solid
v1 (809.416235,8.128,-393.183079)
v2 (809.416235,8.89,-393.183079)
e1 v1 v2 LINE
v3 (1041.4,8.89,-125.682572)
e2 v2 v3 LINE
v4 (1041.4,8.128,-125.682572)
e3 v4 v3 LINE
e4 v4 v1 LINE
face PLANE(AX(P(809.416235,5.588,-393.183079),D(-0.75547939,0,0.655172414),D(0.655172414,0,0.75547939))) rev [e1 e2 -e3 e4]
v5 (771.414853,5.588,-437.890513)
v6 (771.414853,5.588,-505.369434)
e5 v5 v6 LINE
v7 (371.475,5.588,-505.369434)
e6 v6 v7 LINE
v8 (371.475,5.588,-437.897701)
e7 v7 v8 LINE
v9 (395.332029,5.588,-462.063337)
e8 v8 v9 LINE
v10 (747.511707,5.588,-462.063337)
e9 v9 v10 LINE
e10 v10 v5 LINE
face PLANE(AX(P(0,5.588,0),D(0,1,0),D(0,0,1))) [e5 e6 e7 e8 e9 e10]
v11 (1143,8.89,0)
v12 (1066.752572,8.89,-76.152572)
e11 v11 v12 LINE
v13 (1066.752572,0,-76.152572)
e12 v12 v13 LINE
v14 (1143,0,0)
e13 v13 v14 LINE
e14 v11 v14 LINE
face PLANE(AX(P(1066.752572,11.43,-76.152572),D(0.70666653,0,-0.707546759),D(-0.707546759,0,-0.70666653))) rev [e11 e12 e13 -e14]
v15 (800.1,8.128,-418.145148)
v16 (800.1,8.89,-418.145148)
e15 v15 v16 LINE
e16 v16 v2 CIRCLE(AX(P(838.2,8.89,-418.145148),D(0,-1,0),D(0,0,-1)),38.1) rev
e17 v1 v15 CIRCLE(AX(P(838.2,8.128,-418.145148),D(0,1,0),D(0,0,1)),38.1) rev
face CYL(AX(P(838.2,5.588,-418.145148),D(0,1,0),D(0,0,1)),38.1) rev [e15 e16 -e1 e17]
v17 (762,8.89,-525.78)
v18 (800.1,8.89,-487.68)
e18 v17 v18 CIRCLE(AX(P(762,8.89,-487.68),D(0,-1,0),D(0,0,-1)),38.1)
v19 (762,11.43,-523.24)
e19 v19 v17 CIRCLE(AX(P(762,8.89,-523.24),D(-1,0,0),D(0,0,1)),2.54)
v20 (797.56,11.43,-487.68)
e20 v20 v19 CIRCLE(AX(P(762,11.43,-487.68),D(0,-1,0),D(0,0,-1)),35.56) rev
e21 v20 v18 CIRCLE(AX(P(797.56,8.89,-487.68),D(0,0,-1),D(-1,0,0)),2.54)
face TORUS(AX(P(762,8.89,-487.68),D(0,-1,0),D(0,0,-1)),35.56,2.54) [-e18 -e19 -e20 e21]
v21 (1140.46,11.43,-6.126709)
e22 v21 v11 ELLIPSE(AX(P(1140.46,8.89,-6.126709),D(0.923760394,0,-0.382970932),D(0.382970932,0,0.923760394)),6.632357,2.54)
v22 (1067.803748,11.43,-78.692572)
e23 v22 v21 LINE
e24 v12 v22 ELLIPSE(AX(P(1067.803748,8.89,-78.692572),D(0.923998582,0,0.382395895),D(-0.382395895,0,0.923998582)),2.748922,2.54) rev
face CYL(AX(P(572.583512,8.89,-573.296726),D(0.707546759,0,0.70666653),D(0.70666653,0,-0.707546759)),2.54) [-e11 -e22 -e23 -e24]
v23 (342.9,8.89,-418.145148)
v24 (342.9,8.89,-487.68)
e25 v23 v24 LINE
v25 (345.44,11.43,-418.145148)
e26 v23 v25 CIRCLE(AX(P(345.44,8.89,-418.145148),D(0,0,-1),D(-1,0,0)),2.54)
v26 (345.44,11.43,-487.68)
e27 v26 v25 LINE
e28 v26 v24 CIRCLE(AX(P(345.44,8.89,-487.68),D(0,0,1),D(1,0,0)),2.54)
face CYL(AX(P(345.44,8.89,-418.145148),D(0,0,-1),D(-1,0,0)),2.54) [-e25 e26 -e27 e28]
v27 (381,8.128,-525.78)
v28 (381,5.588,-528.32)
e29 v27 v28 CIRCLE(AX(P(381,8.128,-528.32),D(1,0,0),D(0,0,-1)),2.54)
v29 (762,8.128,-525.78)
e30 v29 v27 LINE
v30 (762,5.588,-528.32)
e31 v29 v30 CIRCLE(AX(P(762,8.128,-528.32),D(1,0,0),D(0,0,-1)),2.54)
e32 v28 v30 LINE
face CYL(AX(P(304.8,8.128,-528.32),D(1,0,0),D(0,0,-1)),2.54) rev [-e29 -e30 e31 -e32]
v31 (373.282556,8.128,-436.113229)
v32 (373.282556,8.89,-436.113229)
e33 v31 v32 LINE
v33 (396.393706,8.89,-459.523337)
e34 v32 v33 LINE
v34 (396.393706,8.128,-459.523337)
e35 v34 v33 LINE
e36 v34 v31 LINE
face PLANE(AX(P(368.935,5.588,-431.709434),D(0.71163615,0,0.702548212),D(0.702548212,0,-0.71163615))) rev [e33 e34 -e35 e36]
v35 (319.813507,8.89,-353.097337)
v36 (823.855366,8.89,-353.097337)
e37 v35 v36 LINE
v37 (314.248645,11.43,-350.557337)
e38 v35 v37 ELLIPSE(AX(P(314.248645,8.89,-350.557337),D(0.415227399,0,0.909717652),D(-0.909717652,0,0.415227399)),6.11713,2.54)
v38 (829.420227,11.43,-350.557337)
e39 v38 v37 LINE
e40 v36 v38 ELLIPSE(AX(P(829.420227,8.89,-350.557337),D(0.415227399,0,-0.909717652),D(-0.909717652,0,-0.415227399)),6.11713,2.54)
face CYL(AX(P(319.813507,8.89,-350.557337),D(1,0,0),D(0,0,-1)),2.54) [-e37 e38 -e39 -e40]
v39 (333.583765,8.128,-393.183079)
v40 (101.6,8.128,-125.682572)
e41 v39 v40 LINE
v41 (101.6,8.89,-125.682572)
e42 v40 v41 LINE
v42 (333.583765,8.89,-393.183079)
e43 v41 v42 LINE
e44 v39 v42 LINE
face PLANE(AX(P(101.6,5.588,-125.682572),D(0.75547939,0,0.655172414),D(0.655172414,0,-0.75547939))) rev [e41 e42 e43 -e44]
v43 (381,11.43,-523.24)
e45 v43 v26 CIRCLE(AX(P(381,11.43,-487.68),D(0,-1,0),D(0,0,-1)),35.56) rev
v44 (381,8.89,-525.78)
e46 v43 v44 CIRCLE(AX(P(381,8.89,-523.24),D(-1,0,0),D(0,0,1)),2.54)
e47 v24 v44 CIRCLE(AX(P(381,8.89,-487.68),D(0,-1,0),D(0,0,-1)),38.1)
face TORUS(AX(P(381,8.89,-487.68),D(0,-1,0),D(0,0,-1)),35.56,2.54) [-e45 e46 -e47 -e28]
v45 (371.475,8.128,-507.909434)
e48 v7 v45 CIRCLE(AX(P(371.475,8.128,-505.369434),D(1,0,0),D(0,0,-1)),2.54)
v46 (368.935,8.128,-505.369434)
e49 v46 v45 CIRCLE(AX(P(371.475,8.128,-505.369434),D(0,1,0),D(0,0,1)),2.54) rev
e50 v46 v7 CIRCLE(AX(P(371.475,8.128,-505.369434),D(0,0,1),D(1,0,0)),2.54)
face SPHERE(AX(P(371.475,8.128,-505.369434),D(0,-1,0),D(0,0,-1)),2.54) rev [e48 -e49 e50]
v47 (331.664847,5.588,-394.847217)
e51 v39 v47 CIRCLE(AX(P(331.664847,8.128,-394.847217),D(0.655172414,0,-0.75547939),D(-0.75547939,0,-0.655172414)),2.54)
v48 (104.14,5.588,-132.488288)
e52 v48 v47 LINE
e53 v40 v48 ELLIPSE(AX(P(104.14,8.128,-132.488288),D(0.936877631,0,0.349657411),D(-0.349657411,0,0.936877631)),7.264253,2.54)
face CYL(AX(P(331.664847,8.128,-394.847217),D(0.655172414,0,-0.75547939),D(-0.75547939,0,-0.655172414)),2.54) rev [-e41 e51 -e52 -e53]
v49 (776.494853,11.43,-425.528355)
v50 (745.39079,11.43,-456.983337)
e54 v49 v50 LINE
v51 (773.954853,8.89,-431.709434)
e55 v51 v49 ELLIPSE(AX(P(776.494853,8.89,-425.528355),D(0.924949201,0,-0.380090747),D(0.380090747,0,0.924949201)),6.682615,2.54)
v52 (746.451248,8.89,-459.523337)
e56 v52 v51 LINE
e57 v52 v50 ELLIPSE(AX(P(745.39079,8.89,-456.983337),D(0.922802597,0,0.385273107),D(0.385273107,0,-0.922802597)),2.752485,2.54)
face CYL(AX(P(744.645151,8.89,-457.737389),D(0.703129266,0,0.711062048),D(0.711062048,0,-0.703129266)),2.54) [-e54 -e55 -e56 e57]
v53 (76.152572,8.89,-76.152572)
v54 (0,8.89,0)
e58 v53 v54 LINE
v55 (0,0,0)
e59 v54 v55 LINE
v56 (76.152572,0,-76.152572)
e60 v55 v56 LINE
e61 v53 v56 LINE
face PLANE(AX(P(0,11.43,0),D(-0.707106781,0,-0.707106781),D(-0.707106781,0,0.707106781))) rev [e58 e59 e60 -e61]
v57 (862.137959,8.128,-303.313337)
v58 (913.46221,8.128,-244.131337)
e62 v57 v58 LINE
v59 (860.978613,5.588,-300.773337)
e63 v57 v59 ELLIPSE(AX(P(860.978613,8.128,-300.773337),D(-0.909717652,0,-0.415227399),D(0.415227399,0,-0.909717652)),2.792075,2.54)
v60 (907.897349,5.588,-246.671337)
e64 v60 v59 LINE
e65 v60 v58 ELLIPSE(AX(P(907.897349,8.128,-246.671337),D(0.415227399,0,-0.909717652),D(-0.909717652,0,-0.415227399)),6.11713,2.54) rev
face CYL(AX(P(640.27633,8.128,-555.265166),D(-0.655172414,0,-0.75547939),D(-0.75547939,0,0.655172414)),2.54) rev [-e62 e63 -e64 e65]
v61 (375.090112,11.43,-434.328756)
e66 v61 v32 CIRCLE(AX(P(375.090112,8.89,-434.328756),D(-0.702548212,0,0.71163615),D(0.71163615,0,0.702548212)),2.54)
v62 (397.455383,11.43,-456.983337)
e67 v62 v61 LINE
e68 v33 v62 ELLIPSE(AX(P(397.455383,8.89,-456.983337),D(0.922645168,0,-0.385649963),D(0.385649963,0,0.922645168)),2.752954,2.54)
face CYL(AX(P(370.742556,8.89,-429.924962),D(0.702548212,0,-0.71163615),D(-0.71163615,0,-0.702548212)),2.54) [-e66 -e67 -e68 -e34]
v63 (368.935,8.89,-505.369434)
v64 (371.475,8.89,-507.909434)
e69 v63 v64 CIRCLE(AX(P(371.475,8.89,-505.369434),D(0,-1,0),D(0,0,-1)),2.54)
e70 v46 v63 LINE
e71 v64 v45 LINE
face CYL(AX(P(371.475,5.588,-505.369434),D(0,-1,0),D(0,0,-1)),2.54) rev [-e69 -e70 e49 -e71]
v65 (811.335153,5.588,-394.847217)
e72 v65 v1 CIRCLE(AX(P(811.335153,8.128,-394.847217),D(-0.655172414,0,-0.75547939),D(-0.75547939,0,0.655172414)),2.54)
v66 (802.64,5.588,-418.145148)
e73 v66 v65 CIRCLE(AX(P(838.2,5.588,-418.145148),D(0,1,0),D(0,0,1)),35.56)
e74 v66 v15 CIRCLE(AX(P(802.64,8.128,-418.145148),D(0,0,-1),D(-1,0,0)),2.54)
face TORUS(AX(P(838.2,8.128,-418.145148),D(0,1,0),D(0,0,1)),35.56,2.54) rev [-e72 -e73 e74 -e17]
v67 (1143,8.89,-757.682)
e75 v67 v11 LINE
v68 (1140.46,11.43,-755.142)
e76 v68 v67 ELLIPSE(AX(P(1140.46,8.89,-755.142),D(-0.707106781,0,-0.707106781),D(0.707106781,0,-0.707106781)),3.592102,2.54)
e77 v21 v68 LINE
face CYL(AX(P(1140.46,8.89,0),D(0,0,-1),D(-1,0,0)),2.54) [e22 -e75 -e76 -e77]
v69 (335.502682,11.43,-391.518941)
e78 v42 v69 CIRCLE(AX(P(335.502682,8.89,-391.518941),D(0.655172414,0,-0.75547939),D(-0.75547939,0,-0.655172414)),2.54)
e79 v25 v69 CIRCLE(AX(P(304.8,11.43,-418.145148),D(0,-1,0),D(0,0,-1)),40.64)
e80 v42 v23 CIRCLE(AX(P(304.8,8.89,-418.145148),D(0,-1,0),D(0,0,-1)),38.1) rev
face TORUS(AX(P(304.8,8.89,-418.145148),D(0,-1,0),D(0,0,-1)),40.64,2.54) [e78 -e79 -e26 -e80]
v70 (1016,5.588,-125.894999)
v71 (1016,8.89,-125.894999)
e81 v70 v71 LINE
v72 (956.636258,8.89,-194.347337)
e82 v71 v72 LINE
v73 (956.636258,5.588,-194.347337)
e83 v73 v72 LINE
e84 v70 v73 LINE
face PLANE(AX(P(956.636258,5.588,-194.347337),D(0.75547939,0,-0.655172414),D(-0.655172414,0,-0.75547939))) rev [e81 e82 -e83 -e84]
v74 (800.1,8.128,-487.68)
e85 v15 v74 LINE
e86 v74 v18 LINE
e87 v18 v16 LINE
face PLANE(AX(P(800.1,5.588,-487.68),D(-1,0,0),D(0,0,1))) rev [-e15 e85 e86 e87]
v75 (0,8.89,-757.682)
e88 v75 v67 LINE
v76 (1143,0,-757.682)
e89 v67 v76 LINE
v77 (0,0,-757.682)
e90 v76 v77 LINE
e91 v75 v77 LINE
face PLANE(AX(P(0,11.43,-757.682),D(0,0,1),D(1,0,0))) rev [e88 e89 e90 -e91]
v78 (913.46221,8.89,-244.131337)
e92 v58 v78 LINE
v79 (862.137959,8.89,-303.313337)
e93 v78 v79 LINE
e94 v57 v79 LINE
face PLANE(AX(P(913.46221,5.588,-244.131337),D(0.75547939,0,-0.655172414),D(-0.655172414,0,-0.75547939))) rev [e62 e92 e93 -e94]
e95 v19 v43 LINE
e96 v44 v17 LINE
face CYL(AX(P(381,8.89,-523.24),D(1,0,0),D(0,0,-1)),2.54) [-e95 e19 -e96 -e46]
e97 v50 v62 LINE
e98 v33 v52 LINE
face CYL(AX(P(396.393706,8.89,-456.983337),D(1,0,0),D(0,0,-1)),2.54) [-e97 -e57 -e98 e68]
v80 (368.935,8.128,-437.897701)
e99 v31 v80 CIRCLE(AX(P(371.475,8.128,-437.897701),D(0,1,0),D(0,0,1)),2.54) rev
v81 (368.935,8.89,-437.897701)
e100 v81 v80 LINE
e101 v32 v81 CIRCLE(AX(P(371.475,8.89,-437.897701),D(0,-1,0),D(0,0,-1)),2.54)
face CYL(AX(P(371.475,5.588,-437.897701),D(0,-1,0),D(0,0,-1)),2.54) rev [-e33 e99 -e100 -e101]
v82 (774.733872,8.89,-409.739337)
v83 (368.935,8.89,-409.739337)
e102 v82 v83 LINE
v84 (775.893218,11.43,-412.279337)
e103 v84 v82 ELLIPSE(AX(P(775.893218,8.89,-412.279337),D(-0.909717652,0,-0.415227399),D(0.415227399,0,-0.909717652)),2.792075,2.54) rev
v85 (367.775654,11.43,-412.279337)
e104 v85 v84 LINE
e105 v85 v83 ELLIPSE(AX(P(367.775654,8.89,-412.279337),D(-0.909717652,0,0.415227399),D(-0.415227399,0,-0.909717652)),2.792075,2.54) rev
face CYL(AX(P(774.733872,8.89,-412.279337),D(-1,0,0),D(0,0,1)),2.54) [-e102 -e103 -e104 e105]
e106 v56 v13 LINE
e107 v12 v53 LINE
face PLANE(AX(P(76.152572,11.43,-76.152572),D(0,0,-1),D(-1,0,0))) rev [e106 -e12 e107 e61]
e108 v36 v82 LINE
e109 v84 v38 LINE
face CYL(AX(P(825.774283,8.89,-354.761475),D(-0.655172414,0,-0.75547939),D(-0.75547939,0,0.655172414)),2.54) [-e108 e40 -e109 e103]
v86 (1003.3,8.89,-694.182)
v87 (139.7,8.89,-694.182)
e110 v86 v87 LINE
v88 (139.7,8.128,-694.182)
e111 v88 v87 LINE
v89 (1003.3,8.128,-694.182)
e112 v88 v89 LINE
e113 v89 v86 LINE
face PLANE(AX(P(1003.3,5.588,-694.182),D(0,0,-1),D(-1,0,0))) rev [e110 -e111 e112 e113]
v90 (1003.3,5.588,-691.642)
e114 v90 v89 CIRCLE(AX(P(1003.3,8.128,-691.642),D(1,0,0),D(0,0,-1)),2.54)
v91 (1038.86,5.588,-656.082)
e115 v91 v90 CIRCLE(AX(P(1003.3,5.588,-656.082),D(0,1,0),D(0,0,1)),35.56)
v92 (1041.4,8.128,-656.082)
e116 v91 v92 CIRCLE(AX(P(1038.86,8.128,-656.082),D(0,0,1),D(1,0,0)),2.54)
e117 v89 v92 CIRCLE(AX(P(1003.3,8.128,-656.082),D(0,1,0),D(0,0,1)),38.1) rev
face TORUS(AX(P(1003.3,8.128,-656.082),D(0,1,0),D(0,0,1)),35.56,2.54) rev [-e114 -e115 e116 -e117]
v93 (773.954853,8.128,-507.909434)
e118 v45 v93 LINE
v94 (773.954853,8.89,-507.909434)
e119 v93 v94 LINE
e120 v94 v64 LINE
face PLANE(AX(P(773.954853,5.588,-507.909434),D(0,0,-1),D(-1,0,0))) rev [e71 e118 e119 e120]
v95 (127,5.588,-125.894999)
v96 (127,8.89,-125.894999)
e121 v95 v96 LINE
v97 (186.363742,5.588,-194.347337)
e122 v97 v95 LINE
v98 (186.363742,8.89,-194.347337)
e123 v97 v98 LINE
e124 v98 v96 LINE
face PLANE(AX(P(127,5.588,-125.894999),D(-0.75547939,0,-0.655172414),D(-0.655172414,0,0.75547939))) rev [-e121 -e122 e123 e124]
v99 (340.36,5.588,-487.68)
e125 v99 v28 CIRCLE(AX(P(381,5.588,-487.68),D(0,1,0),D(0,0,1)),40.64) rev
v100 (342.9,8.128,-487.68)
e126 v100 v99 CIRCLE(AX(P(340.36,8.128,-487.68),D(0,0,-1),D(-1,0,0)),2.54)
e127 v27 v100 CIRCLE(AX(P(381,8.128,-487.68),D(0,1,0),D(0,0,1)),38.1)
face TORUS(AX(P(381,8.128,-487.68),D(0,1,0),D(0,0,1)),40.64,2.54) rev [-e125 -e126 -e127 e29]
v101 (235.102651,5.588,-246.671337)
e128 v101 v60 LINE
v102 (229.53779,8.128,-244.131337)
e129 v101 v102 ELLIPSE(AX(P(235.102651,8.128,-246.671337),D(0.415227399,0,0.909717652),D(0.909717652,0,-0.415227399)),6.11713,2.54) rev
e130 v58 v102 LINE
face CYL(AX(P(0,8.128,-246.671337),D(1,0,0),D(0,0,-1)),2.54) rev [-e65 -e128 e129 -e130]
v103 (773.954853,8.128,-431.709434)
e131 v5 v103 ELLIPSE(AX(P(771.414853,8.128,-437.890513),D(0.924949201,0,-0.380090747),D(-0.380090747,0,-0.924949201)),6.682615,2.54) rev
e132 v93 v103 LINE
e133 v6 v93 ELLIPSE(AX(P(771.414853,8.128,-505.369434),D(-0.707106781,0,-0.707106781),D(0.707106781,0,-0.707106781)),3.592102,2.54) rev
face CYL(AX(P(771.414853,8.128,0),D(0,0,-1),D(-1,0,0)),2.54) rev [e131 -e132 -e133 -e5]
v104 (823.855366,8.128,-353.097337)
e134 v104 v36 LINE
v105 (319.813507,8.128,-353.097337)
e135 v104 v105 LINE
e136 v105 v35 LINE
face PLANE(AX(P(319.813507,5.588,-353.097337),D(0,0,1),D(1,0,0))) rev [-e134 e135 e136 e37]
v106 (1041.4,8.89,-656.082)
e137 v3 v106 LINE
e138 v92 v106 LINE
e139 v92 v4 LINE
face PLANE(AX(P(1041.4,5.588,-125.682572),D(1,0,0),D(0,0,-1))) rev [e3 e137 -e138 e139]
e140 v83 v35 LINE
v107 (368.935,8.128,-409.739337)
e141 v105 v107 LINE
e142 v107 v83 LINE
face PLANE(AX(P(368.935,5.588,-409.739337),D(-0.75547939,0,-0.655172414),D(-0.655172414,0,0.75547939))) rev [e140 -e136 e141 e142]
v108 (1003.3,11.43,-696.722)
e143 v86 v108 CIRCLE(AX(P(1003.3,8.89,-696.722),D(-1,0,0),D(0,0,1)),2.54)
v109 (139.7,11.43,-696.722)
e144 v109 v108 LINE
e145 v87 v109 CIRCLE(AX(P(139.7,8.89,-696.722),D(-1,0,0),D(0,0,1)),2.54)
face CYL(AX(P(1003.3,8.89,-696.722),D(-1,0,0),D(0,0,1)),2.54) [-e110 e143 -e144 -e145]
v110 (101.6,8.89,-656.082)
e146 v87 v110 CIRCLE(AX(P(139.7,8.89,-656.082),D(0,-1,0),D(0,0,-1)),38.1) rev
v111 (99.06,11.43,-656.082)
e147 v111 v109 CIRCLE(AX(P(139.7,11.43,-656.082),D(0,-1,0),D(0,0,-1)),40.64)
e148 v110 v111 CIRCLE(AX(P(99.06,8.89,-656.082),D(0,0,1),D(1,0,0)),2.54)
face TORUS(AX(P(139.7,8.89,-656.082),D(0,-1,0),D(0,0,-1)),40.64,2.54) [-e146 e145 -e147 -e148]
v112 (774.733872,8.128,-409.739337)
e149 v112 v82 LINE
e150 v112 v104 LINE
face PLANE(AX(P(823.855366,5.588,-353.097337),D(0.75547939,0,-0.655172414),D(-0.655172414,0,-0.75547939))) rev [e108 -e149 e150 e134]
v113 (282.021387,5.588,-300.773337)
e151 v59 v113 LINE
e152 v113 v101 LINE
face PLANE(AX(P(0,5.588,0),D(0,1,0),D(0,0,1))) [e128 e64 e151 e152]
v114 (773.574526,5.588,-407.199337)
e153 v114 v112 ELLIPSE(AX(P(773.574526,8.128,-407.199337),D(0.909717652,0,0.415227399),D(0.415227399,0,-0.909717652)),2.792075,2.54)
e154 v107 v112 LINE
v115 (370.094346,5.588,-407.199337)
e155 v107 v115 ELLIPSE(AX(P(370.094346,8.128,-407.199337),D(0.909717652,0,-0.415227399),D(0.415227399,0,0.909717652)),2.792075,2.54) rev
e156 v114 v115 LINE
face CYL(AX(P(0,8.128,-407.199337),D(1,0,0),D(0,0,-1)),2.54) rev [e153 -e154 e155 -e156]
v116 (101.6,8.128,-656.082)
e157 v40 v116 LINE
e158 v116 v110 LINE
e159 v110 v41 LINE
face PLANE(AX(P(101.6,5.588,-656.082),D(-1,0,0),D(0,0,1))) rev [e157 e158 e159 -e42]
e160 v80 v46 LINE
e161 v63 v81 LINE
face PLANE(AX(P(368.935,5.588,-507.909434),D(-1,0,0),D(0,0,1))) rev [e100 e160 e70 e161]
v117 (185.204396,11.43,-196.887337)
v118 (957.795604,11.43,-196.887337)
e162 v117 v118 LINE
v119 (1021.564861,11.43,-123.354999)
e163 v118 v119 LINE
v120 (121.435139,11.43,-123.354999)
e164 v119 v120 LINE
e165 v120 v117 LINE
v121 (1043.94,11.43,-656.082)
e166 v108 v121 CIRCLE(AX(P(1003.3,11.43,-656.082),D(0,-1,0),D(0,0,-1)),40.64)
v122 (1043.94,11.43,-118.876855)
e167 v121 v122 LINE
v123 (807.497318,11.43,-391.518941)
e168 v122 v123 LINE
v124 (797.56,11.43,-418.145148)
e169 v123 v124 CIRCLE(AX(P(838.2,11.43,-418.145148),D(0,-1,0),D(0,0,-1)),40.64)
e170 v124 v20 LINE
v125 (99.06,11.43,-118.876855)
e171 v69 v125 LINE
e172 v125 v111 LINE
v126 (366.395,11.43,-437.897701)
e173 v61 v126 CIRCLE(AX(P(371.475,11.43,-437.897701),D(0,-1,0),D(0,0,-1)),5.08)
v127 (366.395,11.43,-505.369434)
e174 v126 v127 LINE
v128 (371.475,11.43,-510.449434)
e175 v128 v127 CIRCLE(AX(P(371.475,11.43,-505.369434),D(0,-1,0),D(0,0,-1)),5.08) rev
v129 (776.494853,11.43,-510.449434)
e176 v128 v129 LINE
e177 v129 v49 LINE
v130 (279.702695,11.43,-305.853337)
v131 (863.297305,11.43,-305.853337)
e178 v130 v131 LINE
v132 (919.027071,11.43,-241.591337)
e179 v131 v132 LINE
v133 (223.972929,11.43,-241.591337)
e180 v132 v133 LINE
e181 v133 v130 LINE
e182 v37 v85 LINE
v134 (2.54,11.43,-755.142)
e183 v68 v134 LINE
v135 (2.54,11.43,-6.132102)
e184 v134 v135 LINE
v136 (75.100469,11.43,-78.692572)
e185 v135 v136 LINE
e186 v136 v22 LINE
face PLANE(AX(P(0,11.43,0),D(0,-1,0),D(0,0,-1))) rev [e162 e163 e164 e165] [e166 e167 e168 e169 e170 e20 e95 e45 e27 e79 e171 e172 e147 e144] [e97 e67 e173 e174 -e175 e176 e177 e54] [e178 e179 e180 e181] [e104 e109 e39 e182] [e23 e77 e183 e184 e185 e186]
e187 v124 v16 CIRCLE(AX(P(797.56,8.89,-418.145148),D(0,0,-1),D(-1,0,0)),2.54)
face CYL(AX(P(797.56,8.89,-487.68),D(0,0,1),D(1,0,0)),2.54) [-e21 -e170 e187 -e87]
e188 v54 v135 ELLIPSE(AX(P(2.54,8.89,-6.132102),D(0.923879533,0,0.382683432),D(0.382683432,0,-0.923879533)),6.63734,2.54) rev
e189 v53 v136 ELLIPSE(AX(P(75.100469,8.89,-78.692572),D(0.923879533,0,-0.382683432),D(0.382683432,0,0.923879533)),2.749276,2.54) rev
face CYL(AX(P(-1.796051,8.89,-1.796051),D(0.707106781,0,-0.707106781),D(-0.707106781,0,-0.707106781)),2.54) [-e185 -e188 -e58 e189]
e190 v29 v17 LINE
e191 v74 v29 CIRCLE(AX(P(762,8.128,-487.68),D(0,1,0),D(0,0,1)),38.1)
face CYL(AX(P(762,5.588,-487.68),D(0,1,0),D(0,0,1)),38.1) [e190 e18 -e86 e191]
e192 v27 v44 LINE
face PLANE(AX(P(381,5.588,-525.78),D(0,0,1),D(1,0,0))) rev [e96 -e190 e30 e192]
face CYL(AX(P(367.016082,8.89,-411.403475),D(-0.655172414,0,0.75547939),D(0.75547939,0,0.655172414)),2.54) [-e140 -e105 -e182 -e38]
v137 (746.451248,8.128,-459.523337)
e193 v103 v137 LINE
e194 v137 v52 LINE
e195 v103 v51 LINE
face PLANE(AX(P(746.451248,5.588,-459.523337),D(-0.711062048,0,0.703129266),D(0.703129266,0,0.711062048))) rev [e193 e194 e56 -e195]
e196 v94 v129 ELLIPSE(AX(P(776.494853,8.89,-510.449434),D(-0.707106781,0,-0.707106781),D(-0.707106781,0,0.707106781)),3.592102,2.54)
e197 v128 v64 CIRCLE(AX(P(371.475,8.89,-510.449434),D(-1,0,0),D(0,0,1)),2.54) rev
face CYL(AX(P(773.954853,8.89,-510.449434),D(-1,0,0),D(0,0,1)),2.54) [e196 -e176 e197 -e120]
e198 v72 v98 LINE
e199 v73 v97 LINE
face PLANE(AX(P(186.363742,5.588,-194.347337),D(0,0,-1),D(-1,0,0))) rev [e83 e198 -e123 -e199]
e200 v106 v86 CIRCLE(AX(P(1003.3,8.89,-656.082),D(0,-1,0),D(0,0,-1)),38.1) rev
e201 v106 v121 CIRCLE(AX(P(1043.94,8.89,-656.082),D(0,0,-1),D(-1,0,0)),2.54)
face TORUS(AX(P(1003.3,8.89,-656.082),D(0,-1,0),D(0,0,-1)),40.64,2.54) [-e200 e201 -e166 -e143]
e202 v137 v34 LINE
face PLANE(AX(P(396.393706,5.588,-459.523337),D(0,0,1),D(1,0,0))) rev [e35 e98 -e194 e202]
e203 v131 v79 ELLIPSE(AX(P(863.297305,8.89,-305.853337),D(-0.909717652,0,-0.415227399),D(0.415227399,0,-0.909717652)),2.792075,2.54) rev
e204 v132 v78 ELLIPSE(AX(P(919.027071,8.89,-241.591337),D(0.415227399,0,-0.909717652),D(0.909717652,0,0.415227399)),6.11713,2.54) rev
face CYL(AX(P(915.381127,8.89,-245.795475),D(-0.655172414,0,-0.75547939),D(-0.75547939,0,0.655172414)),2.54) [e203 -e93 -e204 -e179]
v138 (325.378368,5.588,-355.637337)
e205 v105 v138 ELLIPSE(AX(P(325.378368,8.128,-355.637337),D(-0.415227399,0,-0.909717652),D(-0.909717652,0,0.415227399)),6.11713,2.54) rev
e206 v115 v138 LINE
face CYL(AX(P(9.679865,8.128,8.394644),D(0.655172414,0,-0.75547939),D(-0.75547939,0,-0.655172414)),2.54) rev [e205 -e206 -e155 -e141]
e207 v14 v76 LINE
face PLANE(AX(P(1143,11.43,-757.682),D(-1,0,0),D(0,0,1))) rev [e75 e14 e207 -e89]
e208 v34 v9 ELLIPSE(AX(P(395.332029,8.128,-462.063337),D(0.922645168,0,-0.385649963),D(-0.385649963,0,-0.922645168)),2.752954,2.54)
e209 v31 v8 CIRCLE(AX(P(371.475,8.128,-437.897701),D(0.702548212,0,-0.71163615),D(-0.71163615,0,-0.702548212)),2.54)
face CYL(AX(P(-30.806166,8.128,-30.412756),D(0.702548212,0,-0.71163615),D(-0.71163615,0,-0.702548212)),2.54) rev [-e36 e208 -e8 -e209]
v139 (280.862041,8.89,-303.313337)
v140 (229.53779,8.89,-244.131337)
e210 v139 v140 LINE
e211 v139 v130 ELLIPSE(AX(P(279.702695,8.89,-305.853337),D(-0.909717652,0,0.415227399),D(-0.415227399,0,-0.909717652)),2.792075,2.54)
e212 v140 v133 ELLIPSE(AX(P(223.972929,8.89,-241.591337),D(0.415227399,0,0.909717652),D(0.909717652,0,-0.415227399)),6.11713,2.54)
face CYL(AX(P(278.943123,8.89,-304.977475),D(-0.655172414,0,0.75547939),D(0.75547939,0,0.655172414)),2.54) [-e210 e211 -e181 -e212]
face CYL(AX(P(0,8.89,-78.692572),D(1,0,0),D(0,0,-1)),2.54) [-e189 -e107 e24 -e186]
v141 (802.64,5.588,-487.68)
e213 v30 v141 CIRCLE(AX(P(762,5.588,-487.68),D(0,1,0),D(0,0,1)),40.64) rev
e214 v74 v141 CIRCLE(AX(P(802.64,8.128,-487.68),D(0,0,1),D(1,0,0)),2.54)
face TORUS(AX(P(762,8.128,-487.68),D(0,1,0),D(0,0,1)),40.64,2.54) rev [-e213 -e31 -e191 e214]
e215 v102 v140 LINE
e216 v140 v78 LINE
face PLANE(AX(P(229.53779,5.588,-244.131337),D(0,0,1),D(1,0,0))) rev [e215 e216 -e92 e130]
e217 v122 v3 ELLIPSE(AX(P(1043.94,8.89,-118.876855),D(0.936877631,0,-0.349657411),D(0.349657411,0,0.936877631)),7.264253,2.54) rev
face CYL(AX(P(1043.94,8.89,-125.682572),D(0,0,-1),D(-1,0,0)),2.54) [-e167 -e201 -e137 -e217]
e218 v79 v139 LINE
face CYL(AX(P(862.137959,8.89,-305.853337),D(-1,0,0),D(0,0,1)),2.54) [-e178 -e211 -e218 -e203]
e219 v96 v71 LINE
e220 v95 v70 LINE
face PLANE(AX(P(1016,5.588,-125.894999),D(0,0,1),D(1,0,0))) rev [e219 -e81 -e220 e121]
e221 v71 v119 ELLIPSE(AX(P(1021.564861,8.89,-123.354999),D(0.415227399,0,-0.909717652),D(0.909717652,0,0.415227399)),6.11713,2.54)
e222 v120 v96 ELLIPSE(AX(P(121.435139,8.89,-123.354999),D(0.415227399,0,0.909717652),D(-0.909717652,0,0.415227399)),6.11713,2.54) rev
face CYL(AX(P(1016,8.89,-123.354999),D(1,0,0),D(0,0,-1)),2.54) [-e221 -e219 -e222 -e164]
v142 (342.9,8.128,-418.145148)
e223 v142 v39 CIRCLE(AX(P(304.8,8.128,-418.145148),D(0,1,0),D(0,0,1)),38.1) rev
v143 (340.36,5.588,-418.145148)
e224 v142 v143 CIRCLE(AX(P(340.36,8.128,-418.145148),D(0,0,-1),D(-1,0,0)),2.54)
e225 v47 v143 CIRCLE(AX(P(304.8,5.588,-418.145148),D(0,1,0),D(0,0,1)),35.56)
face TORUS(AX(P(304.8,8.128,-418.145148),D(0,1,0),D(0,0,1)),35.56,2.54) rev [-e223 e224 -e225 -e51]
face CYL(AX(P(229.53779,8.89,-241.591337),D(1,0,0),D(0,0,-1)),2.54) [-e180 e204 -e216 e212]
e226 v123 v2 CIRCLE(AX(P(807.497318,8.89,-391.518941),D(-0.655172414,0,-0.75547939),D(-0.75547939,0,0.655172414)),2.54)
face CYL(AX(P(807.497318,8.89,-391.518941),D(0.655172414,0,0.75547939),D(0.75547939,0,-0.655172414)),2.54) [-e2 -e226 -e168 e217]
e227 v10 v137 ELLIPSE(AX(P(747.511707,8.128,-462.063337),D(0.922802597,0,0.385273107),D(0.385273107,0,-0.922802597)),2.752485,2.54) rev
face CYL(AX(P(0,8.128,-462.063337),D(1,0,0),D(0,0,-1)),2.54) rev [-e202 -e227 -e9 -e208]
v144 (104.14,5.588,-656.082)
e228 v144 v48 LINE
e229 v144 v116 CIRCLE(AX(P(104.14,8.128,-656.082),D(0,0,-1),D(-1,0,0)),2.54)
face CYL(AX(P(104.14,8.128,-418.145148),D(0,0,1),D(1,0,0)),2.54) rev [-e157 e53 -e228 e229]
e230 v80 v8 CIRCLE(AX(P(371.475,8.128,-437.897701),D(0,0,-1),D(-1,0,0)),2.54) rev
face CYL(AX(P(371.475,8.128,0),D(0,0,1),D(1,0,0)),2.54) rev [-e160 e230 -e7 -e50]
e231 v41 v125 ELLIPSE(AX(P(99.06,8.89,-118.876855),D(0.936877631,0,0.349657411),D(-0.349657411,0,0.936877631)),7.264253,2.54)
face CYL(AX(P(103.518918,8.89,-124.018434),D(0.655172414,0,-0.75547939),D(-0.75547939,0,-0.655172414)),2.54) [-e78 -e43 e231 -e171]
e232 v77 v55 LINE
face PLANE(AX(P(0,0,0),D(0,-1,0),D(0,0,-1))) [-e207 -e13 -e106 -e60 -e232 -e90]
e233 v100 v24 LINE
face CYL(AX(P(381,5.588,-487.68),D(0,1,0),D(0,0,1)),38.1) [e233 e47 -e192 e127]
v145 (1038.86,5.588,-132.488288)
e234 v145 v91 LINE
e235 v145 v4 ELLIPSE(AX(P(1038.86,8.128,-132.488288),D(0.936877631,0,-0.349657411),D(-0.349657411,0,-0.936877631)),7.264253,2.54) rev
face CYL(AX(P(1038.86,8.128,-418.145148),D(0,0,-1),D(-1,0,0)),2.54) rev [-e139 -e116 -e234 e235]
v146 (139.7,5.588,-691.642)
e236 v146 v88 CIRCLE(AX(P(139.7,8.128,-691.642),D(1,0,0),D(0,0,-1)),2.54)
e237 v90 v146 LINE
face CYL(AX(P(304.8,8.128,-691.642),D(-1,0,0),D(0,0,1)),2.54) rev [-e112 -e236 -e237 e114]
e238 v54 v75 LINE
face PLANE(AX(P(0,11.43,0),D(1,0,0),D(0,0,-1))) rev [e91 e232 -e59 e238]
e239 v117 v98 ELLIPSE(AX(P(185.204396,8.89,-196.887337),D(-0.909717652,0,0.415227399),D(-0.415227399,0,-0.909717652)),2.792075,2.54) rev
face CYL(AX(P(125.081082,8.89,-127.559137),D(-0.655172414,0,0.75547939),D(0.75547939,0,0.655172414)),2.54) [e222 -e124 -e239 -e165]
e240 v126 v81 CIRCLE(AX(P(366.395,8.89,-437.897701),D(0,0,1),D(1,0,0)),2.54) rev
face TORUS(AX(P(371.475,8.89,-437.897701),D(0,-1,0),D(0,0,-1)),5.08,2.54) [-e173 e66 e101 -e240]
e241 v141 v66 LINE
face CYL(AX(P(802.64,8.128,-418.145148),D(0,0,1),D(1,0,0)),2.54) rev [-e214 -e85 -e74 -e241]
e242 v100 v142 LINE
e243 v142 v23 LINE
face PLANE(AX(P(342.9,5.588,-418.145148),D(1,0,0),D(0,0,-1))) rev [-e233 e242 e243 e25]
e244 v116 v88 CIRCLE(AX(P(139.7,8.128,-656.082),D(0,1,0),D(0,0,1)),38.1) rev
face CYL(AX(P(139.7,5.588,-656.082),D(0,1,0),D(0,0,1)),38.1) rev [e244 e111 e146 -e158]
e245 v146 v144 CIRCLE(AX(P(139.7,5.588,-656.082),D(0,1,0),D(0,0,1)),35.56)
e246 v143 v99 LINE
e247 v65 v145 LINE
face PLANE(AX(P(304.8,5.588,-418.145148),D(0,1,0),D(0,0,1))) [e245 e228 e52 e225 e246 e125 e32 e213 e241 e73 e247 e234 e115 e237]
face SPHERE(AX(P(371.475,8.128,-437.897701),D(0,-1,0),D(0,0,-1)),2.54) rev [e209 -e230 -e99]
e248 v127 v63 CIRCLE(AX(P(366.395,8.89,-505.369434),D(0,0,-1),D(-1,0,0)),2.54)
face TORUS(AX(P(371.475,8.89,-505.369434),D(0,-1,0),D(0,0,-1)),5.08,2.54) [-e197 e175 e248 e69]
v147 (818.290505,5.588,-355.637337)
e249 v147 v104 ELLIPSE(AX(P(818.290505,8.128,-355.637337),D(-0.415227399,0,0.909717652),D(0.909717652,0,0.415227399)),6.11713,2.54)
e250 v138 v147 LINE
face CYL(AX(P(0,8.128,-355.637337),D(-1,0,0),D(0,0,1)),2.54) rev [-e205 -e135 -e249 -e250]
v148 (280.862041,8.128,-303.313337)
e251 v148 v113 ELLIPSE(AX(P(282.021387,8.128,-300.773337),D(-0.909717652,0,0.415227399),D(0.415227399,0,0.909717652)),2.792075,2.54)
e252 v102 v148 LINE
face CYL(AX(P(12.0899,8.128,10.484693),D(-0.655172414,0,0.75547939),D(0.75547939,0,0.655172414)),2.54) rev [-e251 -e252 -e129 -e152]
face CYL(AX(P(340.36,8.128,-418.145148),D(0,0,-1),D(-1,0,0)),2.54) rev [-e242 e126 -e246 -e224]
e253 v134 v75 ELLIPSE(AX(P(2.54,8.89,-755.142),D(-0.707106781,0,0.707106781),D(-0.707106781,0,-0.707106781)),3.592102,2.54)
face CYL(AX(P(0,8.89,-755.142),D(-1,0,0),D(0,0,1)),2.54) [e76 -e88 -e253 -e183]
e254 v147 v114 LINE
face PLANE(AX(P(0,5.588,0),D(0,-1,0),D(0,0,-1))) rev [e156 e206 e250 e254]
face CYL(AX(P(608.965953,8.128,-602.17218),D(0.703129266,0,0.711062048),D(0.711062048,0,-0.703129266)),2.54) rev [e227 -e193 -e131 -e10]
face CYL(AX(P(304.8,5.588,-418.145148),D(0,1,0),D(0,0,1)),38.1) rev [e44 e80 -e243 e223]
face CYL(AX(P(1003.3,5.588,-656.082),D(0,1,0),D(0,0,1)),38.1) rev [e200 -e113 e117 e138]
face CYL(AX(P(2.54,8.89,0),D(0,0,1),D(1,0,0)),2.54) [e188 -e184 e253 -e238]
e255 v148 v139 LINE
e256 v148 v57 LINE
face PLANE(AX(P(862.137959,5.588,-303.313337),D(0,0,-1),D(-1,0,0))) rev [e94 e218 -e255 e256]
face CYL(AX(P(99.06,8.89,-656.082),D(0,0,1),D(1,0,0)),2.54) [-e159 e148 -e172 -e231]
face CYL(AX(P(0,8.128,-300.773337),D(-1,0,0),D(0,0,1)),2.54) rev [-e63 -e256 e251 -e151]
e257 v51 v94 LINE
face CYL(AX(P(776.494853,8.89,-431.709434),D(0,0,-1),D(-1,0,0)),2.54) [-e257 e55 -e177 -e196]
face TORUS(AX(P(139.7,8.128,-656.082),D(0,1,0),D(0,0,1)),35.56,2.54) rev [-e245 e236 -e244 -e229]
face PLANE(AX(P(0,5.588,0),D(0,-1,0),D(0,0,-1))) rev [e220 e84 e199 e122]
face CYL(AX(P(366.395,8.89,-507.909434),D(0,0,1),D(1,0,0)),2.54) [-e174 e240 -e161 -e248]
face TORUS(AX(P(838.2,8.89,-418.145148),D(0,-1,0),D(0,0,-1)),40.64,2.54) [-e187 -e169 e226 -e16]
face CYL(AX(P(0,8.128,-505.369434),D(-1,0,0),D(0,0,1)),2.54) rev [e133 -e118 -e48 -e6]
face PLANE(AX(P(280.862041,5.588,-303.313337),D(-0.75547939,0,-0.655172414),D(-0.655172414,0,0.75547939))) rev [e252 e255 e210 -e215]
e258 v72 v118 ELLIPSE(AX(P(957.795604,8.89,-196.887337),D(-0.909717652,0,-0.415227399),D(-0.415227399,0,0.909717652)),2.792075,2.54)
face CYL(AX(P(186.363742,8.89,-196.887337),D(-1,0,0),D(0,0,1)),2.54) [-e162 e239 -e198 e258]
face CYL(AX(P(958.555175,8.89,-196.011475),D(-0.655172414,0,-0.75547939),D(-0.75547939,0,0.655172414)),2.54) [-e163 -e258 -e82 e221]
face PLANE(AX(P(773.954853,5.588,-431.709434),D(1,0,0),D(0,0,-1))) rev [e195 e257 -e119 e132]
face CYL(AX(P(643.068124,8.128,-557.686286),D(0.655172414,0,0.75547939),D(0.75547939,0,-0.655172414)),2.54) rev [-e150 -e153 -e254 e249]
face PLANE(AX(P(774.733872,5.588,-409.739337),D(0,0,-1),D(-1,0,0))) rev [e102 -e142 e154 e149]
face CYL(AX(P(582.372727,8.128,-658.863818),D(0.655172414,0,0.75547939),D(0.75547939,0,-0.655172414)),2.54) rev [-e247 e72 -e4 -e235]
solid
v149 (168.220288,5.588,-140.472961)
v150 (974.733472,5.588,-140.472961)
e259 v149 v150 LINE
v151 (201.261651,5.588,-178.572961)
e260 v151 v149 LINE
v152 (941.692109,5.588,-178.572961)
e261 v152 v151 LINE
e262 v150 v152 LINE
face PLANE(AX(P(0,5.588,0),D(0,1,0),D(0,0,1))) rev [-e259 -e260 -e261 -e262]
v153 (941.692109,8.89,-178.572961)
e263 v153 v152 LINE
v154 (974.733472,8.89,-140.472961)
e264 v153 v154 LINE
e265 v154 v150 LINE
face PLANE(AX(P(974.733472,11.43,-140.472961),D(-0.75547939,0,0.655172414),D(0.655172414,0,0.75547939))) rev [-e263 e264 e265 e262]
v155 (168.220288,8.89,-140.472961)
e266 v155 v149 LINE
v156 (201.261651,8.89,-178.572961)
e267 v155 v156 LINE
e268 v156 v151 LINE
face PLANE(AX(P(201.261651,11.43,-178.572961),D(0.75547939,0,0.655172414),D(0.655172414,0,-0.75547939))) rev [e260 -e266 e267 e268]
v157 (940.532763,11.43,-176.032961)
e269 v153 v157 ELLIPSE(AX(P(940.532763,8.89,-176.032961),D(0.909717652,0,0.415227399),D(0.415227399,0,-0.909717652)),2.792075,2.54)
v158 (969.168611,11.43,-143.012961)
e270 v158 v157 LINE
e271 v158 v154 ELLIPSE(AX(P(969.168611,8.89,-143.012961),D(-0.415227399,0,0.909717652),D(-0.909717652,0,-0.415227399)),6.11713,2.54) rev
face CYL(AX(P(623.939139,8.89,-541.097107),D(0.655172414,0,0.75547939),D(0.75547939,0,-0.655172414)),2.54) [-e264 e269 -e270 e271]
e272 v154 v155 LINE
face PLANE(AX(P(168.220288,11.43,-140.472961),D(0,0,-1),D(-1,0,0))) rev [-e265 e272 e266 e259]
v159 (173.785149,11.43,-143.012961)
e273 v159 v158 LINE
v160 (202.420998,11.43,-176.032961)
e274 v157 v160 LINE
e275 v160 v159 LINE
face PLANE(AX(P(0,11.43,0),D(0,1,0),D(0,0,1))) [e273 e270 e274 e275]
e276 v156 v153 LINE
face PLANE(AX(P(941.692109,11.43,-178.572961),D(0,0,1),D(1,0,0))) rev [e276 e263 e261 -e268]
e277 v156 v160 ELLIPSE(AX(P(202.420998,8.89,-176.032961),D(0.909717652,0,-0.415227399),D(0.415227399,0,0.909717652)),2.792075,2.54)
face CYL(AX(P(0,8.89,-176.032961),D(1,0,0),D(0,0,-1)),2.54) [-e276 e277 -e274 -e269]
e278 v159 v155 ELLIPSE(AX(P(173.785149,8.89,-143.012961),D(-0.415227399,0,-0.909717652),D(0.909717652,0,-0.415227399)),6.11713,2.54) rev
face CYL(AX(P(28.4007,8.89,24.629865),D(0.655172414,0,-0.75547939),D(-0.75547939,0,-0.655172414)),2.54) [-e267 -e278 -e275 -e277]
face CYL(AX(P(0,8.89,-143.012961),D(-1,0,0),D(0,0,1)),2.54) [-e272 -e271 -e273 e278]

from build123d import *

# Parameters (mm, degrees)
BASE_FLANGE1_DEPTH = 11.43
CUT_EXTRUDE1_DEPTH = 5.842
CUT_EXTRUDE2_DEPTH = 5.842
BASE_FLANGE2_DEPTH = 5.842
CUT_EXTRUDE3_DEPTH = 5.842
FILLET1_R          = 2.54
FILLET2_R          = 2.54
FILLET3_R          = 2.54
FILLET4_R          = 2.54
FILLET5_R          = 2.54


# Sheet-metal steps are written as plain solids
with BuildPart() as part:
    # Sketch1 → Base-Flange1 (new body)
    with BuildSketch(Plane(origin=(0, 0, 0), x_dir=(1, 0, 0), z_dir=(0, 1, 0))):
        Polygon((0, 0), (0, 757.682), (1143, 757.682), (1143, 0), (1066.752571907, 76.152571907), (76.152571907, 76.152571907), align=None)
    extrude(amount=BASE_FLANGE1_DEPTH)

    # Sketch6 → Cut-Extrude1 (cut)
    with BuildSketch(Plane(origin=(0, 11.43, 0), x_dir=(1, 0, 0), z_dir=(0, 1, 0))):
        with BuildLine():
            Line((101.6, 656.082), (101.6, 125.682571907))
            Line((101.6, 125.682571907), (333.583764746, 393.18307912))
            ThreePointArc((333.583764746, 393.18307912), (340.495037728, 404.823200721), (342.9, 418.145148086))
            Line((342.9, 418.145148086), (342.9, 487.68))
            ThreePointArc((342.9, 487.68), (354.059231637, 514.620768363), (381, 525.78))
            Line((381, 525.78), (762, 525.78))
            ThreePointArc((762, 525.78), (788.940768363, 514.620768363), (800.1, 487.68))
            Line((800.1, 487.68), (800.1, 418.145148086))
            ThreePointArc((800.1, 418.145148086), (802.504962272, 404.823200721), (809.416235254, 393.18307912))
            Line((809.416235254, 393.18307912), (1041.4, 125.682571907))
            Line((1041.4, 125.682571907), (1041.4, 656.082))
            ThreePointArc((1041.4, 656.082), (1030.240768363, 683.022768363), (1003.3, 694.182))
            Line((1003.3, 694.182), (139.7, 694.182))
            ThreePointArc((139.7, 694.182), (112.759231637, 683.022768363), (101.6, 656.082))
        make_face()
    extrude(amount=-CUT_EXTRUDE1_DEPTH, mode=Mode.SUBTRACT)

    # Sketch8 → Cut-Extrude2 (cut)
    with BuildSketch(Plane(origin=(0, 11.43, 0), x_dir=(1, 0, 0), z_dir=(0, 1, 0))):
        Polygon((127, 125.894999192), (186.36374215, 194.347337452), (956.63625785, 194.347337452), (1016, 125.894999192), align=None)
    extrude(amount=-CUT_EXTRUDE2_DEPTH, mode=Mode.SUBTRACT)

    # Sketch12 → Cut-Extrude3 (cut)
    with BuildSketch(Plane(origin=(0, 11.43, 0), x_dir=(1, 0, 0), z_dir=(0, 1, 0))):
        Polygon((280.862041135, 303.313337452), (229.537790171, 244.131337452), (913.462209829, 244.131337452), (862.137958865, 303.313337452), align=None)
        Polygon((319.813506588, 353.097337452), (823.855365724, 353.097337452), (774.733872312, 409.739337452), (368.935, 409.739337452), align=None)
        Polygon((368.935, 507.909434387), (368.935, 431.709434387), (396.393706081, 459.523337452), (746.451248248, 459.523337452), (773.954852599, 431.709434387), (773.954852599, 507.909434387), align=None)
    extrude(amount=-CUT_EXTRUDE3_DEPTH, mode=Mode.SUBTRACT)

    # Fillet1
    fillet1_edges = [part.edges().sort_by_distance(p)[0] for p in [
        (571.444926299, 5.588, -507.909434387),
        (368.935, 8.509, -507.909434387),
        (773.954852599, 5.588, -469.809434387),
        (760.203050423, 5.588, -445.61638592),
        (571.422477165, 5.588, -459.523337452),
        (382.664353041, 5.588, -445.61638592),
        (368.935, 5.588, -469.809434387),
        (368.935, 8.509, -431.709434387),
        (571.444926299, 11.43, -507.909434387),
        (368.935, 11.43, -469.809434387),
        (382.664353041, 11.43, -445.61638592),
        (571.422477165, 11.43, -459.523337452),
        (760.203050423, 11.43, -445.61638592),
        (773.954852599, 11.43, -469.809434387),
    ]]
    fillet(fillet1_edges, radius=FILLET1_R)

    # Fillet2
    fillet2_edges = [part.edges().sort_by_distance(p)[0] for p in [
        (571.5, 5.588, -303.313337452),
        (887.800084347, 5.588, -273.722337452),
        (571.5, 5.588, -244.131337452),
        (255.199915653, 5.588, -273.722337452),
        (344.374253294, 5.588, -381.418337452),
        (571.834436156, 5.588, -409.739337452),
        (799.294619018, 5.588, -381.418337452),
        (571.834436156, 5.588, -353.097337452),
    ]]
    fillet(fillet2_edges, radius=FILLET2_R)

    # Fillet3
    fillet3_edges = [part.edges().sort_by_distance(p)[0] for p in [
        (217.591882373, 5.588, -259.432825513),
        (101.6, 5.588, -390.882285953),
        (112.759231637, 5.588, -683.022768363),
        (571.5, 5.588, -694.182),
        (1030.240768363, 5.588, -683.022768363),
        (1041.4, 5.588, -390.882285953),
        (925.408117627, 5.588, -259.432825513),
        (802.504962272, 5.588, -404.823200721),
        (800.1, 5.588, -452.912574043),
        (788.940768363, 5.588, -514.620768363),
        (571.5, 5.588, -525.78),
        (354.059231637, 5.588, -514.620768363),
        (342.9, 5.588, -452.912574043),
        (340.495037728, 5.588, -404.823200721),
    ]]
    fillet(fillet3_edges, radius=FILLET3_R)

    # Fillet5
    fillet5_edges = [part.edges().sort_by_distance(p)[0] for p in [
        (571.5, 11.43, -303.313337452),
        (255.199915653, 11.43, -273.722337452),
        (571.5, 11.43, -244.131337452),
        (887.800084347, 11.43, -273.722337452),
        (344.374253294, 11.43, -381.418337452),
        (571.834436156, 11.43, -353.097337452),
        (799.294619018, 11.43, -381.418337452),
        (571.834436156, 11.43, -409.739337452),
        (1104.876285953, 11.43, -38.076285953),
        (1143, 11.43, -378.841),
        (571.5, 11.43, -757.682),
        (0, 11.43, -378.841),
        (217.591882373, 11.43, -259.432825513),
        (340.495037728, 11.43, -404.823200721),
        (342.9, 11.43, -452.912574043),
        (354.059231637, 11.43, -514.620768363),
        (571.5, 11.43, -525.78),
        (788.940768363, 11.43, -514.620768363),
        (800.1, 11.43, -452.912574043),
        (802.504962272, 11.43, -404.823200721),
        (925.408117627, 11.43, -259.432825513),
        (1041.4, 11.43, -390.882285953),
        (1030.240768363, 11.43, -683.022768363),
        (571.5, 11.43, -694.182),
        (112.759231637, 11.43, -683.022768363),
        (101.6, 11.43, -390.882285953),
        (38.076285953, 11.43, -38.076285953),
        (571.5, 11.43, -125.894999192),
        (986.318128925, 11.43, -160.121168322),
        (571.5, 11.43, -194.347337452),
        (156.681871075, 11.43, -160.121168322),
        (571.452571907, 11.43, -76.152571907),
    ]]
    fillet(fillet5_edges, radius=FILLET5_R)


with BuildPart() as body_2:
    # Sketch9 → Base-Flange2 (new body)
    with BuildSketch(Plane(origin=(0, 5.588, 0), x_dir=(1, 0, 0), z_dir=(0, 1, 0))):
        Polygon((201.261651441, 178.572960564), (168.220288159, 140.472960564), (974.733472203, 140.472960564), (941.692108922, 178.572960564), align=None)
    extrude(amount=BASE_FLANGE2_DEPTH)

    # Fillet4
    fillet4_edges = [body_2.edges().sort_by_distance(p)[0] for p in [
        (571.476880181, 11.43, -140.472960564),
        (958.212790563, 11.43, -159.522960564),
        (571.476880181, 11.43, -178.572960564),
        (184.7409698, 11.43, -159.522960564),
    ]]
    fillet(fillet4_edges, radius=FILLET4_R)


solid = Compound([part.part, body_2.part])
